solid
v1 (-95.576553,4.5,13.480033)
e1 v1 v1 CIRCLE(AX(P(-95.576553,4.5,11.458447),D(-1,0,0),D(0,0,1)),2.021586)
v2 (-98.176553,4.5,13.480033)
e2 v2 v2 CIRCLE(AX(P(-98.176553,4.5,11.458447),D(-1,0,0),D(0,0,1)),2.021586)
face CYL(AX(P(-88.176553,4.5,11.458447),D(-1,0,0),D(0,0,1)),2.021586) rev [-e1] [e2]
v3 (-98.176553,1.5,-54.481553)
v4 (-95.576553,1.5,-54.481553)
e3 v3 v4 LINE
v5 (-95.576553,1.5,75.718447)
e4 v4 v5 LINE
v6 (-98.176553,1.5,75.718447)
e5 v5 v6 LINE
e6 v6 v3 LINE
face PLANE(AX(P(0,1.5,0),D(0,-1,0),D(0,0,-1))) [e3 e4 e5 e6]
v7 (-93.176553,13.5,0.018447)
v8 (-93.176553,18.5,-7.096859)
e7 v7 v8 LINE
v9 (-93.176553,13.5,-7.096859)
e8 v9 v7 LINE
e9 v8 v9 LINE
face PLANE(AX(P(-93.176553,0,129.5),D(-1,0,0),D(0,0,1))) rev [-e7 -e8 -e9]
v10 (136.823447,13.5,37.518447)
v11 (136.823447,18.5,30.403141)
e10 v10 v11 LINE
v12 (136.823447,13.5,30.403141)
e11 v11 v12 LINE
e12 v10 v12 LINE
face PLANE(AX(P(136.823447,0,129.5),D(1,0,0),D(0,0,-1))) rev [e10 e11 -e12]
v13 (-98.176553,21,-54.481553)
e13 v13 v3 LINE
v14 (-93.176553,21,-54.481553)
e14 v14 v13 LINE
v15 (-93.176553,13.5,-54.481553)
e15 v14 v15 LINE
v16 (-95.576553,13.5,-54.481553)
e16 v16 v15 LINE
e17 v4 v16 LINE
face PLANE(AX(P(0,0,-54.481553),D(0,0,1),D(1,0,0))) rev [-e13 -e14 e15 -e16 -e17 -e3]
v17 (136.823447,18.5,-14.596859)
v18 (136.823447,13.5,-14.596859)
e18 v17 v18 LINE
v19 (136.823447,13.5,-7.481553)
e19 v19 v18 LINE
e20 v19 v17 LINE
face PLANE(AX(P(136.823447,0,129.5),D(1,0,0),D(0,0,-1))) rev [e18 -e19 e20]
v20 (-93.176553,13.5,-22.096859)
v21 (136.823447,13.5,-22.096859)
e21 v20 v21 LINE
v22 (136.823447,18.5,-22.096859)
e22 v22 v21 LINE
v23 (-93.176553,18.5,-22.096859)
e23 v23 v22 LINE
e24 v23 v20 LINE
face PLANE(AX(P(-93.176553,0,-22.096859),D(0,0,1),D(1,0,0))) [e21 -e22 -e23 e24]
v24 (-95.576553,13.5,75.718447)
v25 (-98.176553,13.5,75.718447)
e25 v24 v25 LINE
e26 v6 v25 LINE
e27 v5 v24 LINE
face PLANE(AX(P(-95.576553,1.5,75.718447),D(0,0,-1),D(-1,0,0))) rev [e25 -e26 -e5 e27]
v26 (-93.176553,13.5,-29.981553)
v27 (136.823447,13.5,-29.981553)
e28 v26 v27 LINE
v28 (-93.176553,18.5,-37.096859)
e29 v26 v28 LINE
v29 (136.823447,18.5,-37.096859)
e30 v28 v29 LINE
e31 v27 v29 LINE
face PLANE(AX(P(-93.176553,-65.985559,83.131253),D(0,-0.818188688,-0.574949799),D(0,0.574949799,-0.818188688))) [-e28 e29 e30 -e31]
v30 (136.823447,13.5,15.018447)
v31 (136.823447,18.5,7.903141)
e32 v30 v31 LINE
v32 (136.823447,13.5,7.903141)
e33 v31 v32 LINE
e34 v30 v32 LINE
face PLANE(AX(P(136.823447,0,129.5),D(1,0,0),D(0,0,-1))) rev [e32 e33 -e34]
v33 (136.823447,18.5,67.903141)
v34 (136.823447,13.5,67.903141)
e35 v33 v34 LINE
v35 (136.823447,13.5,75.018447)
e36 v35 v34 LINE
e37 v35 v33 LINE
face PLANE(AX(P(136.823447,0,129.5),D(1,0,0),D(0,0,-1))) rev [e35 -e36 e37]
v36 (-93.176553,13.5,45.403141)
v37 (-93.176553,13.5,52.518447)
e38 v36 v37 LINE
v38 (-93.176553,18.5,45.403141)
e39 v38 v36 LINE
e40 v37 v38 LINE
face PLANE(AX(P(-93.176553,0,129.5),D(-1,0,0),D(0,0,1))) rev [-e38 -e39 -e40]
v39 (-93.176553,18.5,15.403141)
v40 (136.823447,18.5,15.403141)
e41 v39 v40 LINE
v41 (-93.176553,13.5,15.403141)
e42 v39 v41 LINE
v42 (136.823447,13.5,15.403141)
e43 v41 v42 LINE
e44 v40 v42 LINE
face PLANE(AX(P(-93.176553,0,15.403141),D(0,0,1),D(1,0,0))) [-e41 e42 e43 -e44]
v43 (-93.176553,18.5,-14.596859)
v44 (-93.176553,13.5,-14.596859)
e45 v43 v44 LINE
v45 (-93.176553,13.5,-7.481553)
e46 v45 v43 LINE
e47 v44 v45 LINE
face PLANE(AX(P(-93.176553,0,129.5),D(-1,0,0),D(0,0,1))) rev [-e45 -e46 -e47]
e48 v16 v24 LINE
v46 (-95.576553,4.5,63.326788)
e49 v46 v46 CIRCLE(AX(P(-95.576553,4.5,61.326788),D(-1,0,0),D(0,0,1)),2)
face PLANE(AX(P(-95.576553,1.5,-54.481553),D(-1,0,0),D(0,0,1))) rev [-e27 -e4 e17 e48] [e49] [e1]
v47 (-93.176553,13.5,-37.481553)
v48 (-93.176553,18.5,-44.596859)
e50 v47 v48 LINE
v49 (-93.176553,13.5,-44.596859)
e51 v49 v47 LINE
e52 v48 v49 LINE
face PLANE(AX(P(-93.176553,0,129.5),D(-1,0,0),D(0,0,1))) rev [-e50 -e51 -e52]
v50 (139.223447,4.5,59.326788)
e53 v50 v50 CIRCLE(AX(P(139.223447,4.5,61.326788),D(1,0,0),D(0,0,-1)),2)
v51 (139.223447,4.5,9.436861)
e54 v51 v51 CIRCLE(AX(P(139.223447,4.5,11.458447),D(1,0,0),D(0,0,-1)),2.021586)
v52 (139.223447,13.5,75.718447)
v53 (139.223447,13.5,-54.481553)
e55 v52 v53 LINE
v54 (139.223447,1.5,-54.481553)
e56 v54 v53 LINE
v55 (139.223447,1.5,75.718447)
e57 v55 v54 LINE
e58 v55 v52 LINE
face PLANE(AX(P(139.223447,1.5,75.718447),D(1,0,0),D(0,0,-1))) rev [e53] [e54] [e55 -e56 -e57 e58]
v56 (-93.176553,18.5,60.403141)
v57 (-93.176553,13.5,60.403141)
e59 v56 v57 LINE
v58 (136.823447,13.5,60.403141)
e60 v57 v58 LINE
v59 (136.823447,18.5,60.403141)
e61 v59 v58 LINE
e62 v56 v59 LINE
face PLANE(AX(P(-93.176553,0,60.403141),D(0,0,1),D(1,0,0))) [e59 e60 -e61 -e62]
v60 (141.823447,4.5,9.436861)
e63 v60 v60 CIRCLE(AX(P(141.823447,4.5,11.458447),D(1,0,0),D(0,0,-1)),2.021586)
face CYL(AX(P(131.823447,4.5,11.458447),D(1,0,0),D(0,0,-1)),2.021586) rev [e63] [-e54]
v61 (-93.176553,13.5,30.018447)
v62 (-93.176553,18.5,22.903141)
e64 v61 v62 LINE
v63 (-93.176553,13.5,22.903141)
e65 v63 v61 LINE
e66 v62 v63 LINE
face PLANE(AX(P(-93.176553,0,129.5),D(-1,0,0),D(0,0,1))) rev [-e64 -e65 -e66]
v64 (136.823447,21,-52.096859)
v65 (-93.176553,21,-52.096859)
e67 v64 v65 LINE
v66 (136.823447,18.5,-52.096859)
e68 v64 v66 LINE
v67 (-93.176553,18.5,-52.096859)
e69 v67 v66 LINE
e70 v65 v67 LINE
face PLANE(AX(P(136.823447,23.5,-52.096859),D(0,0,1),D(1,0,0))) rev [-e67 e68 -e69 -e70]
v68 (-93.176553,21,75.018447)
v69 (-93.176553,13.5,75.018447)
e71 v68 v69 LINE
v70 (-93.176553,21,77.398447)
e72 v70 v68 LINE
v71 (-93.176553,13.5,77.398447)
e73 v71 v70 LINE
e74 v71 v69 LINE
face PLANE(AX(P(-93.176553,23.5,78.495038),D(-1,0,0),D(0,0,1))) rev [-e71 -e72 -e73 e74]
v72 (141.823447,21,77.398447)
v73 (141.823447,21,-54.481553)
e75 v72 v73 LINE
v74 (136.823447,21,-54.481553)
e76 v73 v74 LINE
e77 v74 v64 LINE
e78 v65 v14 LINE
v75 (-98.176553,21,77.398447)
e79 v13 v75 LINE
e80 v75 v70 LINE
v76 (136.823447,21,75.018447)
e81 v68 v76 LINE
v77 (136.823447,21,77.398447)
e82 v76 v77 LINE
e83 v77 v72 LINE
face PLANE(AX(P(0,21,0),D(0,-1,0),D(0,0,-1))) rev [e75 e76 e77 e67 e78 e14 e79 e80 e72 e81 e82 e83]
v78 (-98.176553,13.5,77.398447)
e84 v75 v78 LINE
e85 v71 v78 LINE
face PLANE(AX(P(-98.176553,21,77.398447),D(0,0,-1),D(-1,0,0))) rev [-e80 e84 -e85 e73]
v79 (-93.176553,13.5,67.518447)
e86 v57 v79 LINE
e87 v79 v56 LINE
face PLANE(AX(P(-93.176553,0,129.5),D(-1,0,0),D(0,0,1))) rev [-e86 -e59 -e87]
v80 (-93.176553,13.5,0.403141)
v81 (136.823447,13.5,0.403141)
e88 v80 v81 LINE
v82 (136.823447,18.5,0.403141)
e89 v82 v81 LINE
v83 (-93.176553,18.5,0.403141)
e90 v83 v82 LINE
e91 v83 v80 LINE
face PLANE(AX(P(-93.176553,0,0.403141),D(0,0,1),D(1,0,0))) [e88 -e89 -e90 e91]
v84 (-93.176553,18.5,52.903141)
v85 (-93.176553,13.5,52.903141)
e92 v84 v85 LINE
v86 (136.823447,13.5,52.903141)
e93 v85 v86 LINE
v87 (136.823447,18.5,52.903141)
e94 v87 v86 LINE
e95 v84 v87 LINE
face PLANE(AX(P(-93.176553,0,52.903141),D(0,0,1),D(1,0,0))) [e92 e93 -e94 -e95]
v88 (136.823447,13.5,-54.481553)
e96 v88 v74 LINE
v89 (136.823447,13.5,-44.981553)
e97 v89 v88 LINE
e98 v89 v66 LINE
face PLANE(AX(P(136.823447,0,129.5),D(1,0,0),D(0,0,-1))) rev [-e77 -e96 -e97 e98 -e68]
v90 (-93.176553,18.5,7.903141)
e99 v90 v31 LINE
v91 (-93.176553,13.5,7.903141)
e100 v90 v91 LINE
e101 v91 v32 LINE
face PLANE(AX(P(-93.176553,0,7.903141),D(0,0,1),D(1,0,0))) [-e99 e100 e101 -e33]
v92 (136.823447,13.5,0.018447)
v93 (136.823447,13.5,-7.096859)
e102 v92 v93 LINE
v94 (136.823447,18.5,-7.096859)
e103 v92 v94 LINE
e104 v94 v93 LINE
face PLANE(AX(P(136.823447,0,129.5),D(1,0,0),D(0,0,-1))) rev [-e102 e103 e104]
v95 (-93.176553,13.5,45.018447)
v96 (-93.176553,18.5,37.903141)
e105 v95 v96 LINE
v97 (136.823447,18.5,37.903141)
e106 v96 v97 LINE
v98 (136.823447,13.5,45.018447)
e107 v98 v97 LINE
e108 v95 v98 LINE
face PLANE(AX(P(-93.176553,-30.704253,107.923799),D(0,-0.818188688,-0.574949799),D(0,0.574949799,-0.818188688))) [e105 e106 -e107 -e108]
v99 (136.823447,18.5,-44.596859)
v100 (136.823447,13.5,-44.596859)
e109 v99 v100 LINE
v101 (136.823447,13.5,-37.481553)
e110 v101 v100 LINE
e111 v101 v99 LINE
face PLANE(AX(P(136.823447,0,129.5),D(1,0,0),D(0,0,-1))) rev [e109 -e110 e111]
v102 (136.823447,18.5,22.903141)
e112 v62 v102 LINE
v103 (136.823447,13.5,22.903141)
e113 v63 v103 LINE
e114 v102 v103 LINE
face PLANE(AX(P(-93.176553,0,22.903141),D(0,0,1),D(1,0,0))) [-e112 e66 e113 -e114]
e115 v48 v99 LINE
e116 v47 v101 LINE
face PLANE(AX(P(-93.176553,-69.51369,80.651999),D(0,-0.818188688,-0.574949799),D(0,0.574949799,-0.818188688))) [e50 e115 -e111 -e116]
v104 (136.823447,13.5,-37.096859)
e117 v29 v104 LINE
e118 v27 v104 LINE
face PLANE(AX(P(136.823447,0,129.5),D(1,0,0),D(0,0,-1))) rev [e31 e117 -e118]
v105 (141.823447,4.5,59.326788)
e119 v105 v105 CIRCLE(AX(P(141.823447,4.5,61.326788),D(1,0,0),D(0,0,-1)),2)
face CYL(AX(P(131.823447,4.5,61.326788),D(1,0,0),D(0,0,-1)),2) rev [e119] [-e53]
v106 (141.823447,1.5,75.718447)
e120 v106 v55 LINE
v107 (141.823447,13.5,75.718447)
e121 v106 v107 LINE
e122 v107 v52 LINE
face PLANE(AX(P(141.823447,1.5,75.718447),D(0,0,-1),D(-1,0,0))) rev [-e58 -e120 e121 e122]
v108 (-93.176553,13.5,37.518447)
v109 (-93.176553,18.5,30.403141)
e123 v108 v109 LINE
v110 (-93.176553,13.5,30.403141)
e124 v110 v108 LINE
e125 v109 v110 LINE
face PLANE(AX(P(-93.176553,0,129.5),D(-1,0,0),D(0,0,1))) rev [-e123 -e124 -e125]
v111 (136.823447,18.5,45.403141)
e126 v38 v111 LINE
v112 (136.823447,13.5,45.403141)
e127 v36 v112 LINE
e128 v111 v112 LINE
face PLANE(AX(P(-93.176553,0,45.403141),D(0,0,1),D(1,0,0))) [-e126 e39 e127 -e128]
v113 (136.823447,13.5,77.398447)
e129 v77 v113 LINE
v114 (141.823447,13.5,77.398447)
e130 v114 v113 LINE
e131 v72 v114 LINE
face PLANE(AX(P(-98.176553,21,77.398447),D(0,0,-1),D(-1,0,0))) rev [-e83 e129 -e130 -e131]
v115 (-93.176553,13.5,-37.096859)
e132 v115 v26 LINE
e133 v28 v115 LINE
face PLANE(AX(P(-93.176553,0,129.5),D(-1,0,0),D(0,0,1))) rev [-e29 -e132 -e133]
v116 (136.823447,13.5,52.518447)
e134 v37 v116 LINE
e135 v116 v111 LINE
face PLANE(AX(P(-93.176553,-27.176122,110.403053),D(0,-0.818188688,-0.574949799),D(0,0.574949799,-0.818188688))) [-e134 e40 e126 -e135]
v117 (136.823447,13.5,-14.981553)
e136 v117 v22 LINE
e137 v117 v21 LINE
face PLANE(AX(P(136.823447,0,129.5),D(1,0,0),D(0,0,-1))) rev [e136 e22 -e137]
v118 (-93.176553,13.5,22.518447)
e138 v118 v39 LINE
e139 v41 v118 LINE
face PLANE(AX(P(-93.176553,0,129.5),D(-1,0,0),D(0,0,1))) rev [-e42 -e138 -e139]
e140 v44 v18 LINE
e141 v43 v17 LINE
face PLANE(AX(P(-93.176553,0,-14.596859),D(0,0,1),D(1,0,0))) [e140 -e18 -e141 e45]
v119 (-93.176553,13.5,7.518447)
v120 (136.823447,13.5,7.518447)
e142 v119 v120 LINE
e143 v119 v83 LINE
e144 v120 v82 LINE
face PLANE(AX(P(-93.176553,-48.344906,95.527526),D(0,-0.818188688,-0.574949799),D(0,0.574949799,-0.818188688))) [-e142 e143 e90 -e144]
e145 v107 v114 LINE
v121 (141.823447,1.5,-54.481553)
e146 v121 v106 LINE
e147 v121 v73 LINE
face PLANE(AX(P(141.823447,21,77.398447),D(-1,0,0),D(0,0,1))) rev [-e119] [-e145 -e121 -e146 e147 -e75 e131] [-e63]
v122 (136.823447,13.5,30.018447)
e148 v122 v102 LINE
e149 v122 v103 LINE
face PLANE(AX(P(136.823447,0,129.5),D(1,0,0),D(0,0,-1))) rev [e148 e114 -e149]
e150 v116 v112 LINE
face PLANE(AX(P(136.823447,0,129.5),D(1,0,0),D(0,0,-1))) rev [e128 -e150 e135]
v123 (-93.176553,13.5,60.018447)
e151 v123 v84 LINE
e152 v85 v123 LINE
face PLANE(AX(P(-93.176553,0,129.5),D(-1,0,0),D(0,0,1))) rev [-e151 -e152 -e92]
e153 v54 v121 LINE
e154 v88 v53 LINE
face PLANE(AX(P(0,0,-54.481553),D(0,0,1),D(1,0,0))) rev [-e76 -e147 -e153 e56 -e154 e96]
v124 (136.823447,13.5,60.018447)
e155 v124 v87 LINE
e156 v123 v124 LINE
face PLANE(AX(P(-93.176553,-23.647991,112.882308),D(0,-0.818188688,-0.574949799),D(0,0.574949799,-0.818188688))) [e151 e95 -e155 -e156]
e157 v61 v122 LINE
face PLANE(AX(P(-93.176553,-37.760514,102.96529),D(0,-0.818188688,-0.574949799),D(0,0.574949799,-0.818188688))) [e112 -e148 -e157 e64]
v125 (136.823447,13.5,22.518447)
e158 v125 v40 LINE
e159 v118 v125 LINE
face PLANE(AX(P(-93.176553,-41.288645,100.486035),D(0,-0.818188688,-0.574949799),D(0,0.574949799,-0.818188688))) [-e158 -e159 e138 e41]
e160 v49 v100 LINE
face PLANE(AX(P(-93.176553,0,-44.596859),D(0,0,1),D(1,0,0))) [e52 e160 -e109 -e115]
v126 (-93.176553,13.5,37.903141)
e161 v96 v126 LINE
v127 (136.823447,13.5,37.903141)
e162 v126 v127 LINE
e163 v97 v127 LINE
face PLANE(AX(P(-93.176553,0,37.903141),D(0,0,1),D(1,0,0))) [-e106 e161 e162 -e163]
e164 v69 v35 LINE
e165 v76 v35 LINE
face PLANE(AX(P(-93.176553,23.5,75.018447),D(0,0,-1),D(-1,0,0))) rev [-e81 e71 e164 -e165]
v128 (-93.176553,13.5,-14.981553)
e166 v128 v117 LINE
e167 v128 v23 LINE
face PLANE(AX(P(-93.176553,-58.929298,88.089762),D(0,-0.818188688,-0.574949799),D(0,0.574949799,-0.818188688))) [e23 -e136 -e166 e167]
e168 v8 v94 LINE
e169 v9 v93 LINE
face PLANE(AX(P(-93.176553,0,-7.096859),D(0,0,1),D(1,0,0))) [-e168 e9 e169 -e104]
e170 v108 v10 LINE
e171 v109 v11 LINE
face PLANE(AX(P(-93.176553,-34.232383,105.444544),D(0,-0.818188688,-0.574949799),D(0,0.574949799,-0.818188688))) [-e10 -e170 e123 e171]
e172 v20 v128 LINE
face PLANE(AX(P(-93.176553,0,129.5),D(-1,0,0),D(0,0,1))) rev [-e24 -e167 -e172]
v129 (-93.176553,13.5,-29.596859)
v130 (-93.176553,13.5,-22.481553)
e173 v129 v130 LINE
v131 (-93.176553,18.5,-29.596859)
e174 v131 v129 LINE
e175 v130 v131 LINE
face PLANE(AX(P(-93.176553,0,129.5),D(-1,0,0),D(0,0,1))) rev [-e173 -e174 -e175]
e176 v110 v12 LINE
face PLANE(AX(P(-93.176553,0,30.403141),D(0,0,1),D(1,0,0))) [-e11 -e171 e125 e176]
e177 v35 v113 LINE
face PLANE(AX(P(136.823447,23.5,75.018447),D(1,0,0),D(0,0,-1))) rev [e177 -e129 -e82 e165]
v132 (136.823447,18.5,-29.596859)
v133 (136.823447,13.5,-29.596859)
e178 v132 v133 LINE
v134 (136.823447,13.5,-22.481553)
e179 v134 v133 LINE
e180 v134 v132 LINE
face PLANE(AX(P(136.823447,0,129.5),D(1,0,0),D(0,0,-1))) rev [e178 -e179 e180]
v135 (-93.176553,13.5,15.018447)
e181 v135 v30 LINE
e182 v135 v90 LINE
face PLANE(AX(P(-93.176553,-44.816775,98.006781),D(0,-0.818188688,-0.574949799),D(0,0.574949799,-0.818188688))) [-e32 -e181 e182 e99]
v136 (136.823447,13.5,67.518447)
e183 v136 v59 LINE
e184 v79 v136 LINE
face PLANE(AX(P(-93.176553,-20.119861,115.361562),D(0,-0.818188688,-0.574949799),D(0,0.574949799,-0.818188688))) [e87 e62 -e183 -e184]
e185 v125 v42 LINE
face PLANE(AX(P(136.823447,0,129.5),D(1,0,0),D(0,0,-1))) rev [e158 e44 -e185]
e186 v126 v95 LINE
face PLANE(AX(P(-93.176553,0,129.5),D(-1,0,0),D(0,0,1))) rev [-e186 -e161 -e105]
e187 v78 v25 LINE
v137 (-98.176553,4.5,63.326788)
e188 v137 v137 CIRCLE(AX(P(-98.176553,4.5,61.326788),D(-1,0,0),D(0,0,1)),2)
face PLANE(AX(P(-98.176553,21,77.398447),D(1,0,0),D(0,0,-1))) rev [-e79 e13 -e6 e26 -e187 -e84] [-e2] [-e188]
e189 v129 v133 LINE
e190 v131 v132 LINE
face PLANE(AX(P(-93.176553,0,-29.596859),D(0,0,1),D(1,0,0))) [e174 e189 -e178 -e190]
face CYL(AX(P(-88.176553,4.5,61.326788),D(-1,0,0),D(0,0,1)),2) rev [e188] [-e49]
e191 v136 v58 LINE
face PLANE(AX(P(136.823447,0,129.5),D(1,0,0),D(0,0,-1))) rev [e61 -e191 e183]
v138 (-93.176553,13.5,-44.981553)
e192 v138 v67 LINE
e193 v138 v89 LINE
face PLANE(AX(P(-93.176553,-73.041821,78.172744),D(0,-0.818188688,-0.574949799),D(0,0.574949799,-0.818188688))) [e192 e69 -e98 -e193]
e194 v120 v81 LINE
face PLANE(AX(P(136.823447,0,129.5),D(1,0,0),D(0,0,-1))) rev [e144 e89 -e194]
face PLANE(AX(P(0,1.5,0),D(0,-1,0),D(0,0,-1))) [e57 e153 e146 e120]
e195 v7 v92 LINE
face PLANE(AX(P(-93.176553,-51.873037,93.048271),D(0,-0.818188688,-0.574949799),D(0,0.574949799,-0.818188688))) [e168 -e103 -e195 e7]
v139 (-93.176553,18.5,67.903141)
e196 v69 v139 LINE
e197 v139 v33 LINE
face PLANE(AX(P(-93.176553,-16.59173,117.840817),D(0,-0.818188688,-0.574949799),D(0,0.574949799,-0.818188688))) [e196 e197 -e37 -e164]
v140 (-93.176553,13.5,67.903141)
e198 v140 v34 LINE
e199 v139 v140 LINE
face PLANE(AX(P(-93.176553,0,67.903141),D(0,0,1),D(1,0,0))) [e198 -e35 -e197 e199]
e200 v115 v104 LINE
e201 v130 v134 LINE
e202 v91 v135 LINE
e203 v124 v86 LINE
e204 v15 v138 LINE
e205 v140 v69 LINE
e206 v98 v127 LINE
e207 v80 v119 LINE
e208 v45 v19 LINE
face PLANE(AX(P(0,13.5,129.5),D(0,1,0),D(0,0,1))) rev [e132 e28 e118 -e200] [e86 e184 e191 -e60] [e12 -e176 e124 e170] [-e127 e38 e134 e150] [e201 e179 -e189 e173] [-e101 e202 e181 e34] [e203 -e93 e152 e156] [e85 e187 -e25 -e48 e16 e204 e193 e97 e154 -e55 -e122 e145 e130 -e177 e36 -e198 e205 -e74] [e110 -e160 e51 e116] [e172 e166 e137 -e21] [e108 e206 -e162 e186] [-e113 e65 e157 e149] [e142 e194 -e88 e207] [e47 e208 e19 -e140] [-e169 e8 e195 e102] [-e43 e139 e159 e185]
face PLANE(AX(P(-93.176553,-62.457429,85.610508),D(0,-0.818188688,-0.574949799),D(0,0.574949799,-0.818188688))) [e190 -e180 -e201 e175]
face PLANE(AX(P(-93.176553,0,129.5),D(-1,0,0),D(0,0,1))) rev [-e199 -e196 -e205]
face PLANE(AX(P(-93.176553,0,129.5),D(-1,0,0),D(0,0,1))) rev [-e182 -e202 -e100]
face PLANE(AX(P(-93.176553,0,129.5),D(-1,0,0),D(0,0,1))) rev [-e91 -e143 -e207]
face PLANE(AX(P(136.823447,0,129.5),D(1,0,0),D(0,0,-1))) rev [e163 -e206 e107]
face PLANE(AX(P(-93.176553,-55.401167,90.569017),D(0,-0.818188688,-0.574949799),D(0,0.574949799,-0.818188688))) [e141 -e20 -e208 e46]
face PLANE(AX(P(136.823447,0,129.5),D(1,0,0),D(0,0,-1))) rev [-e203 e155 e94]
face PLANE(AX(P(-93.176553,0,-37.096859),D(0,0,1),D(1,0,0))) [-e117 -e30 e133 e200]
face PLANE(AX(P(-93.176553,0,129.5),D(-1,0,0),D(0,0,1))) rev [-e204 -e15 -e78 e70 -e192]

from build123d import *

# Parameters (mm, degrees)
SKETCH1_W           = 240
SKETCH1_H           = 351.15
BOSS_EXTRUDE3_DEPTH = 21
SKETCH5_W           = 248.975913499
SKETCH5_H           = 113.170869772
CUT_EXTRUDE5_DEPTH  = 254
CAVITY1_START       = -93.176553254
CAVITY1_DEPTH       = 230
SKETCH6_W           = 230
SKETCH6_H           = 2.384694545
CUT_EXTRUDE6_DEPTH  = 10
SKETCH7_W           = 329.692379319
SKETCH7_H           = 158.801284786
CUT_EXTRUDE10_DEPTH = 41
SKETCH11_W          = 230
SKETCH11_H          = 3.476591165
CUT_EXTRUDE14_DEPTH = 10
SKETCH9_W           = 2.6
SKETCH9_H           = 130.2
BOSS_EXTRUDE4_DEPTH = 12
SKETCH14_R          = 2.021585834
CUT_EXTRUDE15_DEPTH = 10
CUT_EXTRUDE16_START = -10
SKETCH13_R          = 2.021585834
CUT_EXTRUDE16_DEPTH = 10
SKETCH16_R          = 2
CUT_EXTRUDE17_DEPTH = 10
CUT_EXTRUDE18_START = -10
SKETCH15_R          = 2
CUT_EXTRUDE18_DEPTH = 10


with BuildPart() as part:
    # Sketch1 → Boss-Extrude3 (new body)
    with BuildSketch(Plane(origin=(0, 0, 0), x_dir=(1, 0, 0), z_dir=(0, 1, 0))):
        with Locations((21.823446746, 98.176553254)):
            Rectangle(SKETCH1_W, SKETCH1_H)
    extrude(amount=BOSS_EXTRUDE3_DEPTH)

    # Sketch5 → Cut-Extrude5 (cut)
    with BuildSketch(Plane(origin=(0, 0, -54.481553254), x_dir=(-1, 0, 0), z_dir=(0, 0, -1))):
        with Locations((-20.8478358, 4.110963623)):
            Rectangle(SKETCH5_W, SKETCH5_H)
    extrude(amount=CUT_EXTRUDE5_DEPTH, mode=Mode.SUBTRACT)

    # Cavity1: read off the stored shape, not the designer's step
    # Cavity1 outline → Cavity1 (cut)
    with BuildSketch(Plane.YZ.offset(CAVITY1_START)):
        Polygon((18.5, 60.403141291), (13.5, 67.518446746), (13.5, 67.903141291), (18.5, 67.903141291), (13.5, 75.018446746), (5, 75.018446746), (5, -54.481553254), (13.5, -54.481553254), (13.5, -52.096858709), (18.5, -52.096858709), (13.5, -44.981553254), (13.5, -44.596858709), (18.5, -44.596858709), (13.5, -37.481553254), (13.5, -37.096858709), (18.5, -37.096858709), (13.5, -29.981553254), (13.5, -29.596858709), (18.5, -29.596858709), (13.5, -22.481553254), (13.5, -22.096858709), (18.5, -22.096858709), (13.5, -14.981553254), (13.5, -14.596858709), (18.5, -14.596858709), (13.5, -7.481553254), (13.5, -7.096858709), (18.5, -7.096858709), (13.5, 0.018446746), (13.5, 0.403141291), (18.5, 0.403141291), (13.5, 7.518446746), (13.5, 7.903141291), (18.5, 7.903141291), (13.5, 15.018446746), (13.5, 15.403141291), (18.5, 15.403141291), (13.5, 22.518446746), (13.5, 22.903141291), (18.5, 22.903141291), (13.5, 30.018446746), (13.5, 30.403141291), (18.5, 30.403141291), (13.5, 37.518446746), (13.5, 37.903141291), (18.5, 37.903141291), (13.5, 45.018446746), (13.5, 45.403141291), (18.5, 45.403141291), (13.5, 52.518446746), (13.5, 52.903141291), (18.5, 52.903141291), (13.5, 60.018446746), (13.5, 60.403141291), align=None)
    extrude(amount=CAVITY1_DEPTH, mode=Mode.SUBTRACT)

    # Sketch6 → Cut-Extrude6 (cut)
    with BuildSketch(Plane(origin=(0, 13.5, 0), x_dir=(-1, 0, 0), z_dir=(0, -1, 0))):
        with Locations((-21.823446746, 53.289205982)):
            Rectangle(SKETCH6_W, SKETCH6_H)
    extrude(amount=-CUT_EXTRUDE6_DEPTH, mode=Mode.SUBTRACT)

    # Sketch7 → Cut-Extrude10 (cut)
    with BuildSketch(Plane(origin=(0, 13.5, 0), x_dir=(-1, 0, 0), z_dir=(0, -1, 0))):
        with Locations((-33.84938791, -12.885366014)):
            Rectangle(SKETCH7_W, SKETCH7_H)
    extrude(amount=CUT_EXTRUDE10_DEPTH, mode=Mode.SUBTRACT)

    # Sketch11 → Cut-Extrude14 (cut)
    with BuildSketch(Plane.XZ.offset(-13.5)):
        with Locations((21.823446746, 76.756742329)):
            Rectangle(SKETCH11_W, SKETCH11_H)
    extrude(amount=-CUT_EXTRUDE14_DEPTH, mode=Mode.SUBTRACT)

    # Sketch9 → Boss-Extrude4 (add)
    with BuildSketch(Plane.XZ.offset(-13.5)):
        with Locations((-96.876553254, 10.618446746)):
            Rectangle(SKETCH9_W, SKETCH9_H)
        with Locations((140.523446746, 10.618446746)):
            Rectangle(SKETCH9_W, SKETCH9_H)
    extrude(amount=BOSS_EXTRUDE4_DEPTH)

    # Sketch14 → Cut-Extrude15 (cut)
    with BuildSketch(Plane.ZY.offset(98.176553254)):
        with Locations((11.458446746, 4.5)):
            Circle(SKETCH14_R)
    extrude(amount=-CUT_EXTRUDE15_DEPTH, mode=Mode.SUBTRACT)

    # Sketch13 → Cut-Extrude16 (cut)
    with BuildSketch(Plane(origin=(141.823446746, 0, 0), x_dir=(0, 0, -1), z_dir=(1, 0, 0)).offset(CUT_EXTRUDE16_START)):
        with Locations(Location((-11.458446746, 4.5, 0), (0, 0, 180))):
            Circle(SKETCH13_R)
    extrude(amount=CUT_EXTRUDE16_DEPTH, mode=Mode.SUBTRACT)

    # Sketch16 → Cut-Extrude17 (cut)
    with BuildSketch(Plane(origin=(141.823446746, 0, 0), x_dir=(0, 0, -1), z_dir=(1, 0, 0))):
        with Locations((-61.32678821, 4.5)):
            Circle(SKETCH16_R)
    extrude(amount=-CUT_EXTRUDE17_DEPTH, mode=Mode.SUBTRACT)

    # Sketch15 → Cut-Extrude18 (cut)
    with BuildSketch(Plane.ZY.offset(98.176553254).offset(CUT_EXTRUDE18_START)):
        with Locations(Location((61.32678821, 4.5, 0), (0, 0, 180))):
            Circle(SKETCH15_R)
    extrude(amount=CUT_EXTRUDE18_DEPTH, mode=Mode.SUBTRACT)


solid = part.part
